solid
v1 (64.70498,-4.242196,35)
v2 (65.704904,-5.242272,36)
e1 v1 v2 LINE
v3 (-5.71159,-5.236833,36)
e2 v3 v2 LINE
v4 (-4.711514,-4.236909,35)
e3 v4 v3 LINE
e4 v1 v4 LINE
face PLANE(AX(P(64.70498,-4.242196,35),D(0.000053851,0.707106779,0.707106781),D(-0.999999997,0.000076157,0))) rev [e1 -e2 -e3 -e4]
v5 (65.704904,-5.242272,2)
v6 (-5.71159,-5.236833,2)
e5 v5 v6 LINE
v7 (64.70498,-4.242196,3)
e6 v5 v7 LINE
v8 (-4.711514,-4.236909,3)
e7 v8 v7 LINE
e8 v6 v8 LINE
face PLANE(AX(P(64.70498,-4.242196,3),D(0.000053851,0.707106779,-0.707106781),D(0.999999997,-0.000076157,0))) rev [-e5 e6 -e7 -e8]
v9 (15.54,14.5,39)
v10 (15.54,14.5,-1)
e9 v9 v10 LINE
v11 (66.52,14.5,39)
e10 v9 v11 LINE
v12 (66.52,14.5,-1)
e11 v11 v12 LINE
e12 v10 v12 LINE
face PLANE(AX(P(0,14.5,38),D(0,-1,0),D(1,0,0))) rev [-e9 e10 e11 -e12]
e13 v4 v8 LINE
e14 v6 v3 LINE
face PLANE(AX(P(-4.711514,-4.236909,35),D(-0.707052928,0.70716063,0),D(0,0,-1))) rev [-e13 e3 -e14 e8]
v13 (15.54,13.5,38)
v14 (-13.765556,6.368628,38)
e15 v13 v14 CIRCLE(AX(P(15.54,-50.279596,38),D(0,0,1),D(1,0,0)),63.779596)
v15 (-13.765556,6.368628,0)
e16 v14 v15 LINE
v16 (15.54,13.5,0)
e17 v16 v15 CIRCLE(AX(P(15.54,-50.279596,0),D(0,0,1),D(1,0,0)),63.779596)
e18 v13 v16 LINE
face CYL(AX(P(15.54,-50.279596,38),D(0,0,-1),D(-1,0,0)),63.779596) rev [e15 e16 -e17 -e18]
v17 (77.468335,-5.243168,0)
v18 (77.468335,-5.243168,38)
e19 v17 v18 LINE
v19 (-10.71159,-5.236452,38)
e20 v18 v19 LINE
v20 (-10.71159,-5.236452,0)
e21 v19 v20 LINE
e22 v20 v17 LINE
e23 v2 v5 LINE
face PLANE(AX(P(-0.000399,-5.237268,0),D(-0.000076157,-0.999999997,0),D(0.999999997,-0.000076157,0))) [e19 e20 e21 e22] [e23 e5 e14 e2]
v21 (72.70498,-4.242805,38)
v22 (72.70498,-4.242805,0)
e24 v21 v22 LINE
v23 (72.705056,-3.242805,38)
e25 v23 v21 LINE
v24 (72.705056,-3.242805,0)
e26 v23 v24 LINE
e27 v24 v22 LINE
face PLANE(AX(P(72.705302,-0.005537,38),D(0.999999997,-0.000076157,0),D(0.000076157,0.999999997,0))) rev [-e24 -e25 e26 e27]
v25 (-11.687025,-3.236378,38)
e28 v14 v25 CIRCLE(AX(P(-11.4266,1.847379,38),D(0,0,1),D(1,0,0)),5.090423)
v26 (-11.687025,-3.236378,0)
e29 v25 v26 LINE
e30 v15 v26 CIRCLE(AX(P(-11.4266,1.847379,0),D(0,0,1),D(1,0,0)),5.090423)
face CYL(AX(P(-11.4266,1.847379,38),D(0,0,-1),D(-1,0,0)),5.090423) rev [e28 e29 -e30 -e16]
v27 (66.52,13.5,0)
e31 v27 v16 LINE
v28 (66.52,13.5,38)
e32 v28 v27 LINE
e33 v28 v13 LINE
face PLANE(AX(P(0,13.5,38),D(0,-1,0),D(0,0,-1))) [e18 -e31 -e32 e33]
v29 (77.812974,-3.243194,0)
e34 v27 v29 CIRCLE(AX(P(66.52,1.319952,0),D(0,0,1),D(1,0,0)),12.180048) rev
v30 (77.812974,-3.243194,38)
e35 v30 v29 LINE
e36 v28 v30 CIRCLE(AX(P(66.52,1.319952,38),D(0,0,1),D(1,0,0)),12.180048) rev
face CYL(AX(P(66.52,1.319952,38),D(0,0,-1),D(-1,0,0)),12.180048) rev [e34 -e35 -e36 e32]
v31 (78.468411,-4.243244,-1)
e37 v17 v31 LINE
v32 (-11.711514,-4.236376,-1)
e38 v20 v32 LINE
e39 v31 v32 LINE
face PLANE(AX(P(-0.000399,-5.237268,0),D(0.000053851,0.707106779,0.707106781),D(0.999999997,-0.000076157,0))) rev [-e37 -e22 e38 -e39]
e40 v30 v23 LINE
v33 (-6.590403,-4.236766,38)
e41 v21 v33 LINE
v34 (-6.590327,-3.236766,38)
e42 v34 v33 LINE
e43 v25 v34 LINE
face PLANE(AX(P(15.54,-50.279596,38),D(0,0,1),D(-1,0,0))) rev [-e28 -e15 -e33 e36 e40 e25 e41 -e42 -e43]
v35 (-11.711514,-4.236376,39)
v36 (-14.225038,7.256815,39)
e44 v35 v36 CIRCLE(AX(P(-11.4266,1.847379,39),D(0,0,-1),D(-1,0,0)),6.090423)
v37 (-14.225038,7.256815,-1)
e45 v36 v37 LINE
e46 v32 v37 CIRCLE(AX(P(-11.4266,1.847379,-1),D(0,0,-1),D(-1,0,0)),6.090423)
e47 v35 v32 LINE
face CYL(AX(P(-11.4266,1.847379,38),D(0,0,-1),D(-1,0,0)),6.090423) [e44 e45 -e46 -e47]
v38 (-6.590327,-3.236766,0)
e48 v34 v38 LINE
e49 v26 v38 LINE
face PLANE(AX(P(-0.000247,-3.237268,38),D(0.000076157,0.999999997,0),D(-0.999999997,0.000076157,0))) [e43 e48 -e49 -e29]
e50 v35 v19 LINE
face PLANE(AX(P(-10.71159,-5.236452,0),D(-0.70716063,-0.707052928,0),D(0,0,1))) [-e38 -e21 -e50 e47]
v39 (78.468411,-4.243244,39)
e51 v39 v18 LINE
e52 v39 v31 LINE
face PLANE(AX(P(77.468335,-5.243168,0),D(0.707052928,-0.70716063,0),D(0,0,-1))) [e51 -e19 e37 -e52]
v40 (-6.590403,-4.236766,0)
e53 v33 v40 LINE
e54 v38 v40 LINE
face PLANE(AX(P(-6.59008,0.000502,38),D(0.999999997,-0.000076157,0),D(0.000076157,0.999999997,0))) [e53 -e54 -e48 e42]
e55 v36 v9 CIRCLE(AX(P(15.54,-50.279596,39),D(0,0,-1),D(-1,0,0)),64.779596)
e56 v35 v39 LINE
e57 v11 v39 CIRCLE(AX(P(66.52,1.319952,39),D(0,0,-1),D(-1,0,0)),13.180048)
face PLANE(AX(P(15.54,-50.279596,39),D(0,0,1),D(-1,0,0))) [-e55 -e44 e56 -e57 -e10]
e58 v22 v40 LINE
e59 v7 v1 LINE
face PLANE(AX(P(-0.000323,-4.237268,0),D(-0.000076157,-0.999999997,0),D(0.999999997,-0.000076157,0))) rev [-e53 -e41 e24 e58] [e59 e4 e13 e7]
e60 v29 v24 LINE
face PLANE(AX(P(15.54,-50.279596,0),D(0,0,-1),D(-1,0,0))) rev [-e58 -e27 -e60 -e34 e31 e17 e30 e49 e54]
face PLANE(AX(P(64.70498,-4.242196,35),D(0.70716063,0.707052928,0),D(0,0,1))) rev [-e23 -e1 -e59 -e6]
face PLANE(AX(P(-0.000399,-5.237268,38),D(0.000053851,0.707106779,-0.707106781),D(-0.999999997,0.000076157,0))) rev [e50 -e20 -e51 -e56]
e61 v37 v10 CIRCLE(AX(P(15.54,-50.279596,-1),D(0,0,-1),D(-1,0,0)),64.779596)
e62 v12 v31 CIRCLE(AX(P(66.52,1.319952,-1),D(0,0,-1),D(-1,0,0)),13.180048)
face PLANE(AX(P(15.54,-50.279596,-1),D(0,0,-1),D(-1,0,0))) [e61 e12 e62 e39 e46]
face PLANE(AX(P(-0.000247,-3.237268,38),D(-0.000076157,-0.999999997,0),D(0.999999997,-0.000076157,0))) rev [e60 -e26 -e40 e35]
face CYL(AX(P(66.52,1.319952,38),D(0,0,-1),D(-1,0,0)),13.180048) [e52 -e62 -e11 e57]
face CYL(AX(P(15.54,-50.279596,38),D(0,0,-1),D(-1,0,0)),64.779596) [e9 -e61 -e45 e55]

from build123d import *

# Parameters (mm, degrees)
BOSS_EXTRUDE1_DEPTH = 38
BOSS_EXTRUDE2_START = 1
BOSS_EXTRUDE2_DEPTH = 1
SKETCH3_W           = 90.179925192
SKETCH3_H           = 40
SKETCH3_W_2         = 69.416494059
SKETCH3_H_2         = 32
BOSS_EXTRUDE3_DEPTH = 1
CHAMFER1_SIZE       = 1


with BuildPart() as part:
    # Sketch1 → Boss-Extrude1 (new body)
    with BuildSketch(Plane.XY):
        with BuildLine():
            Line((66.52, 14.5), (15.54, 14.5))
            ThreePointArc((15.54, 14.5), (0.223169493, 12.66316181), (-14.225037528, 7.256815055))
            ThreePointArc((-14.225037528, 7.256815055), (-17.376400179, 0.546177113), (-11.711514098, -4.236375954))
            Line((-11.711514098, -4.236375954), (-6.590403043, -4.236765961))
            Line((-6.590403043, -4.236765961), (-6.590326886, -3.236765964))
            Line((-6.590326886, -3.236765964), (-11.687025279, -3.236377816))
            ThreePointArc((-11.687025279, -3.236377816), (-16.401861513, 0.77072863), (-13.765555848, 6.368627808))
            ThreePointArc((-13.765555848, 6.368627808), (0.459614785, 11.691517006), (15.54, 13.5))
            Line((15.54, 13.5), (66.52, 13.5))
            ThreePointArc((66.52, 13.5), (76.617843982, 8.130760845), (77.812974461, -3.243193847))
            Line((77.812974461, -3.243193847), (72.705055873, -3.242804844))
            Line((72.705055873, -3.242804844), (72.704979716, -4.242804841))
            Line((72.704979716, -4.242804841), (78.468410832, -4.243243765))
            ThreePointArc((78.468410832, -4.243243765), (77.633884428, 8.404811863), (66.52, 14.5))
        make_face()
    extrude(amount=BOSS_EXTRUDE1_DEPTH)

    # Sketch2 → Boss-Extrude2 (add)
    with BuildSketch(Plane(origin=(0, 0, 0), x_dir=(-1, 0, 0), z_dir=(0, 0, -1)).offset(BOSS_EXTRUDE2_START)):
        with BuildLine():
            Line((-72.704979716, -4.242804841), (6.590403043, -4.236765961))
            Line((6.590403043, -4.236765961), (11.711514098, -4.236375954))
            ThreePointArc((11.711514098, -4.236375954), (17.376400179, 0.546177113), (14.225037528, 7.256815055))
            ThreePointArc((14.225037528, 7.256815055), (-0.223169493, 12.66316181), (-15.54, 14.5))
            Line((-15.54, 14.5), (-66.52, 14.5))
            ThreePointArc((-66.52, 14.5), (-77.633884428, 8.404811863), (-78.468410832, -4.243243765))
            Line((-78.468410832, -4.243243765), (-72.704979716, -4.242804841))
        make_face()
    boss_extrude2 = extrude(amount=-BOSS_EXTRUDE2_DEPTH)

    # Mirror1: Boss-Extrude2 across plane
    add(boss_extrude2.mirror(Plane.XY.offset(19)))

    # Sketch3 → Boss-Extrude3 (add)
    with BuildSketch(Plane(origin=(-0.000322697, -4.23726784, 0), x_dir=(0.9999999971000731, -7.615677136513779e-05, 0), z_dir=(-7.615677136513779e-05, -0.9999999971000731, 0))):
        with Locations((33.378771161, 19)):
            Rectangle(SKETCH3_W, SKETCH3_H)
        with Locations((29.997055594, 19)):
            Rectangle(SKETCH3_W_2, SKETCH3_H_2, mode=Mode.SUBTRACT)
    extrude(amount=BOSS_EXTRUDE3_DEPTH)

    # Chamfer1
    chamfer1_edges = [part.edges().sort_by_distance(p)[0] for p in [
        (-11.711590255, -5.236375951, 19),
        (-4.711590275, -5.236909048, 19),
        (29.996656654, -5.239552316, 3),
        (29.996656654, -5.239552316, 35),
        (64.704903583, -5.242195584, 19),
        (78.468334676, -5.243243763, 19),
        (33.37837221, -5.239809857, 39),
        (33.37837221, -5.239809857, -1),
    ]]
    chamfer(chamfer1_edges, length=CHAMFER1_SIZE - 0.0001)  # a hair under: the kernel refuses the full size


solid = part.part
